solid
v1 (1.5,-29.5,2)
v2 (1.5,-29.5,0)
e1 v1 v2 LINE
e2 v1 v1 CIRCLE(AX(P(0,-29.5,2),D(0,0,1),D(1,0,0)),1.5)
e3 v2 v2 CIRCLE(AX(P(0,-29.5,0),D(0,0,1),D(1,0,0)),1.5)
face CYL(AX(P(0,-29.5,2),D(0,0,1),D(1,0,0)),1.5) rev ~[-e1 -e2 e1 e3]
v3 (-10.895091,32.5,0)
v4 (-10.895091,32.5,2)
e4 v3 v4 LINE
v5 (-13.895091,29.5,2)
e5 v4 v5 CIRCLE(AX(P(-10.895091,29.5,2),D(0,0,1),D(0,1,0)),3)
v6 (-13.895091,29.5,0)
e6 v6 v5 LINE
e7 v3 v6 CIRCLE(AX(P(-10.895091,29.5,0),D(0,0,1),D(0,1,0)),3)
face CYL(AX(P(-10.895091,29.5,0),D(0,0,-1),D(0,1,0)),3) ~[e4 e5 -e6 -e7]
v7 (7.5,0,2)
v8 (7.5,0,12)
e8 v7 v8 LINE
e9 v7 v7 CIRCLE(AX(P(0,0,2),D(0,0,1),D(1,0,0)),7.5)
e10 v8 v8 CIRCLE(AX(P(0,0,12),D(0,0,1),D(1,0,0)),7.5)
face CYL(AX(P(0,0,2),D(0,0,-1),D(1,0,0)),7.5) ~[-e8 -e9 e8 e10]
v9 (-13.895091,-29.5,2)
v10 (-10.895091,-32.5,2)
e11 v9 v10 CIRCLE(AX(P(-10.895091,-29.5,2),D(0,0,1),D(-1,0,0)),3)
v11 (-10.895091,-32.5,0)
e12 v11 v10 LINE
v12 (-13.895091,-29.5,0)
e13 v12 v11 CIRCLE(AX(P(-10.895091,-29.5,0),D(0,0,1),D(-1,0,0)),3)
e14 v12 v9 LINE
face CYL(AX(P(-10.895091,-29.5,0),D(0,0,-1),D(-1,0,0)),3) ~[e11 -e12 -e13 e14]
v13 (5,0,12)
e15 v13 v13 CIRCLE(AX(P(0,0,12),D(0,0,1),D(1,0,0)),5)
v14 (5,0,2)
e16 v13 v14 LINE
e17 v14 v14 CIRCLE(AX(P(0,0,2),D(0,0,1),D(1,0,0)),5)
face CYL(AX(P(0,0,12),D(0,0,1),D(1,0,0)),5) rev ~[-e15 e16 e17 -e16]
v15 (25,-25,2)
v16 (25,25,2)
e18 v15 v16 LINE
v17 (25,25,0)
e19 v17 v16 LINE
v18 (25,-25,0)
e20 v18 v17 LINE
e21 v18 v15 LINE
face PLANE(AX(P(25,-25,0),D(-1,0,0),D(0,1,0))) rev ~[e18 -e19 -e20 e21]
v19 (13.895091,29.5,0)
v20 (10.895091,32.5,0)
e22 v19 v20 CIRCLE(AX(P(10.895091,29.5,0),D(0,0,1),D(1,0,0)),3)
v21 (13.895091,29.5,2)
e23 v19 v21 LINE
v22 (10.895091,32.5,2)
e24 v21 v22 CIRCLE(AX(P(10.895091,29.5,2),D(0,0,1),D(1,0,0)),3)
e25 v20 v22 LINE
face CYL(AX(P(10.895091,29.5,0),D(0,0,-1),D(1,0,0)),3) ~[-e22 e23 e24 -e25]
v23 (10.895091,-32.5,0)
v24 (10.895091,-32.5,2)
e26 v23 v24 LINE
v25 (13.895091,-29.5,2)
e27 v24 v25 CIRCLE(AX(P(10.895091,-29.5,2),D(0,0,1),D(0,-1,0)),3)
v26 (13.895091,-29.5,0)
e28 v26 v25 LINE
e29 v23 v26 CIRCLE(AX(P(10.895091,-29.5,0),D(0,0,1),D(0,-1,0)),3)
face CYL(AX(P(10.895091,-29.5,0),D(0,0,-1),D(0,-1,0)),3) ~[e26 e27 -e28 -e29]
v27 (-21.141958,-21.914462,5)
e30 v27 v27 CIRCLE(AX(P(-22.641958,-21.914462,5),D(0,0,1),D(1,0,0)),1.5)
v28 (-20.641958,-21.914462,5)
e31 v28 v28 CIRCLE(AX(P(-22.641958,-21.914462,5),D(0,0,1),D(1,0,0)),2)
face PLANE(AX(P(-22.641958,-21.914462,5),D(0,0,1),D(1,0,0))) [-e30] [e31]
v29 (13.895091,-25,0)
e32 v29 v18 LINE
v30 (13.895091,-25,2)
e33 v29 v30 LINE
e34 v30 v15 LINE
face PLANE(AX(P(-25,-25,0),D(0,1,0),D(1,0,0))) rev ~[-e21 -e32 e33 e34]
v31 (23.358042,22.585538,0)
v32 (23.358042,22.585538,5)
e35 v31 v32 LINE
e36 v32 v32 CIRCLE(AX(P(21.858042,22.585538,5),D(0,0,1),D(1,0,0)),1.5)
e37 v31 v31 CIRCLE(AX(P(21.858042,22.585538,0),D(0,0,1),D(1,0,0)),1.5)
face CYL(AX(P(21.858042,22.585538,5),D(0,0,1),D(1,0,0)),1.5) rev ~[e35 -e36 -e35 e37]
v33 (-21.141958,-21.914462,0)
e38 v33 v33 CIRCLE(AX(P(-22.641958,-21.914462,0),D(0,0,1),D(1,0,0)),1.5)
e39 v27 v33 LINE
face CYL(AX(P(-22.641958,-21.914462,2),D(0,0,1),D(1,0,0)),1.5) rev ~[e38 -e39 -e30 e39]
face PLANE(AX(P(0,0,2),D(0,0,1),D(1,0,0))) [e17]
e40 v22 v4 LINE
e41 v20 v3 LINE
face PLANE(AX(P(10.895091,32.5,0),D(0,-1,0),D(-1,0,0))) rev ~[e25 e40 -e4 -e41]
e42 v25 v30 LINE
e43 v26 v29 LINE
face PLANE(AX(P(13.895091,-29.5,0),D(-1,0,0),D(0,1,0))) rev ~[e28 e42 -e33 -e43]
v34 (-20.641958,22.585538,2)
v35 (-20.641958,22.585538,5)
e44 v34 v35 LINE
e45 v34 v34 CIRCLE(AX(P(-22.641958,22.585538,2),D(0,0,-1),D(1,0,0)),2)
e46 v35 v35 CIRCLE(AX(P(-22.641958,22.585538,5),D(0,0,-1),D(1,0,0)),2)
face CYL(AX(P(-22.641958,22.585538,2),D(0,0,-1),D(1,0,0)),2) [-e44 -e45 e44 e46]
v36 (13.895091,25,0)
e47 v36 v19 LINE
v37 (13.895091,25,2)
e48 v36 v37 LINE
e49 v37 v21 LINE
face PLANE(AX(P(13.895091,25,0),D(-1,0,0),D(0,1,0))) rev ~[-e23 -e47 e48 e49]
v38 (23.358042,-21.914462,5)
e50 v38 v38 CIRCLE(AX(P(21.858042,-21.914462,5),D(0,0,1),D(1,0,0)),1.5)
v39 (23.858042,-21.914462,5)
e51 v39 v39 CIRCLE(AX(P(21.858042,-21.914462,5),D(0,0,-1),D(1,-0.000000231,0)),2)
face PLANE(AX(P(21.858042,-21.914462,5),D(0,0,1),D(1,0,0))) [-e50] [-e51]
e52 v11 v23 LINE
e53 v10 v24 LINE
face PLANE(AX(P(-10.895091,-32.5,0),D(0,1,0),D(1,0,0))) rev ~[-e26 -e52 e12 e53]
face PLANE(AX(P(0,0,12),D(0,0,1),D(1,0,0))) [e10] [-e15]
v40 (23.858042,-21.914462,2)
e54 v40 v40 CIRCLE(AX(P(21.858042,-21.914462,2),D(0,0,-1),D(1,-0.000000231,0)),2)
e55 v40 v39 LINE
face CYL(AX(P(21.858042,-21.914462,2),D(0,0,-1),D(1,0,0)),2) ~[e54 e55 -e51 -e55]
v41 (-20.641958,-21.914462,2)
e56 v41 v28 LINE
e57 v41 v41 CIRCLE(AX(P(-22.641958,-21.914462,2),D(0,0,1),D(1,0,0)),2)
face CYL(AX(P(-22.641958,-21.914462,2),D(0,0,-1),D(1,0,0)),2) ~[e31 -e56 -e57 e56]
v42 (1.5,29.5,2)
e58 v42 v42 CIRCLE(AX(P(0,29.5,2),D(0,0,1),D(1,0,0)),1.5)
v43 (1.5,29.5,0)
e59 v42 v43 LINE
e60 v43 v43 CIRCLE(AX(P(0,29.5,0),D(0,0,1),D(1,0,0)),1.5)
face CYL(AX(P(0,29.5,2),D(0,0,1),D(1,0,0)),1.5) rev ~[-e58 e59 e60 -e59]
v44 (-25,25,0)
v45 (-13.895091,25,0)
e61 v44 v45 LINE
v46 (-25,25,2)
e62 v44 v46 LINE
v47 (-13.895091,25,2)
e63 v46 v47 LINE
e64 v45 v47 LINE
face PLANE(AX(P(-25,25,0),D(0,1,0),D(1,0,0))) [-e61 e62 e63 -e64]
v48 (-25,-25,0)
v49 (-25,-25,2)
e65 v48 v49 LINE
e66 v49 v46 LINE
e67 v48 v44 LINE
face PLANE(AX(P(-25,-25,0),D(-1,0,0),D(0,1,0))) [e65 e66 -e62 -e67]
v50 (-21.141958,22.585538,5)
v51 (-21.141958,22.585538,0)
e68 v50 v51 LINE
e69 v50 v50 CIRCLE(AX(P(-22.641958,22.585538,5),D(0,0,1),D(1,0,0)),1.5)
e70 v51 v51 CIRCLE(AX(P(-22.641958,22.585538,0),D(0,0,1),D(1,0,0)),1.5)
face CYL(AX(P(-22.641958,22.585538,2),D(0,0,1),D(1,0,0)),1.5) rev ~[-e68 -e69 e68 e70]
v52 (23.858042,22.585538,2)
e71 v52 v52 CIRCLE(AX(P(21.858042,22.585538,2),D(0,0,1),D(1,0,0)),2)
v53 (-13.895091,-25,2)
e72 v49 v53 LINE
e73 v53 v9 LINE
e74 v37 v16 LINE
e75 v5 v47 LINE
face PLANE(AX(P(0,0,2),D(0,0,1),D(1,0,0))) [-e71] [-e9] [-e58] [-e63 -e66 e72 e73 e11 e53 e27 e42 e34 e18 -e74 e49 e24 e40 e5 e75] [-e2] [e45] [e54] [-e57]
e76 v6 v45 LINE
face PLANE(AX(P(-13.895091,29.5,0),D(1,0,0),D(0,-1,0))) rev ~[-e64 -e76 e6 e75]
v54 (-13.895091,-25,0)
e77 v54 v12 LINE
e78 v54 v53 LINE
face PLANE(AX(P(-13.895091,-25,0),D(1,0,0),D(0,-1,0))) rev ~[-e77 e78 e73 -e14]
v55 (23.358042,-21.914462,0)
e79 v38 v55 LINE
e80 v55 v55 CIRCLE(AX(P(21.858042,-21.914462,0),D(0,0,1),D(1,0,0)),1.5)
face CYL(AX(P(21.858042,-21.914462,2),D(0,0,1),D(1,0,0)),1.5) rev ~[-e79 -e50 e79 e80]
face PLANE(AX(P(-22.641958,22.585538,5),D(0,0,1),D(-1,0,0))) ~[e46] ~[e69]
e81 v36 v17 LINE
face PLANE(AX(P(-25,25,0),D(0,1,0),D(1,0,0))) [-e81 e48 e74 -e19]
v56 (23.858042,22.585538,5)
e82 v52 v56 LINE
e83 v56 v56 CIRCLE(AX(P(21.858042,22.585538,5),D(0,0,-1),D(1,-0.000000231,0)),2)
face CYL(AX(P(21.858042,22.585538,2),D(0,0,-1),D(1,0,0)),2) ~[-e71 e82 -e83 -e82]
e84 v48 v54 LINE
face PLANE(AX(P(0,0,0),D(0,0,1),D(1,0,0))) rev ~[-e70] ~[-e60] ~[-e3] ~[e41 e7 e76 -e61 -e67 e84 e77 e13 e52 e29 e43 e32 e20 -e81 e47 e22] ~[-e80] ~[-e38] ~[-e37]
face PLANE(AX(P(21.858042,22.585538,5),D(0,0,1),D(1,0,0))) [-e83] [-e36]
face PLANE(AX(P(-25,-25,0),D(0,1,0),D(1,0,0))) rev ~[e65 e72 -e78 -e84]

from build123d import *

# Parameters (mm, degrees)
F0_W      = 50
F0_H      = 50
F1_DEPTH  = 2
F2_R      = 2
F3_DEPTH  = 3
F4_R      = 1.5
F5_DEPTH  = 3
F7_DEPTH  = 2
F8_R      = 1.5
F9_DEPTH  = 25
F10_R     = 7.5
F11_DEPTH = 10
F12_R     = 5
F13_DEPTH = 10
F14_DEPTH = 7.7


# Not quite as in the source:
# - a pattern or mirror of a feature is missing from the dataset's text; its kind, count and spacing are read off the source's solid
# - a feature names something its author has since deleted; it is built from what else it names


with BuildPart() as f1:
    # F0 (on Top) → F1 (new body)
    with BuildSketch(Plane.XY):
        Rectangle(F0_W, F0_H)
    extrude(amount=F1_DEPTH)

    # F2 (on face) → F3 (join)
    with BuildSketch(Plane.XY.offset(2)):
        with Locations((-22.6419584364, -21.9144617685)):
            Circle(F2_R)
        with Locations((21.8580415636, -21.9144617685)):
            Circle(F2_R)
        with Locations((21.8580415636, 22.5855382315)):
            Circle(F2_R)
    f3 = extrude(amount=F3_DEPTH)

    # F3_copies: F3 across plane
    add(f3.mirror(Plane.ZX.offset(0.335538)))

    # F4 (on face) → F5 (cut)
    with BuildSketch(Plane.XY.offset(5)):
        with Locations((-22.6419584364, 22.5855382315)):
            Circle(F4_R)
        with Locations((21.8580415636, -21.9144617685)):
            Circle(F4_R)
        with Locations((21.8580415636, 22.5855382315)):
            Circle(F4_R)
        with Locations((-22.6419584364, -21.9144617685)):
            Circle(F4_R)
    extrude(amount=-F5_DEPTH, mode=Mode.SUBTRACT)

    # F6 (on Top) → F7 (join)
    with BuildSketch(Plane.XY):
        with BuildLine():
            ThreePointArc((13.8950906601, 29.5), (13.0164110037, 31.6213203436), (10.8950906601, 32.5))
            Line((10.8950906601, 32.5), (-10.8950906601, 32.5))
            ThreePointArc((-10.8950906601, 32.5), (-13.0164110037, 31.6213203436), (-13.8950906601, 29.5))
            Line((-13.8950906601, 29.5), (-13.8950906601, 25))
            Line((-13.8950906601, 25), (13.8950906601, 25))
            Line((13.8950906601, 25), (13.8950906601, 29.5))
        make_face()
        with BuildLine():
            Line((13.8950906601, -25), (-13.8950906601, -25))
            Line((-13.8950906601, -25), (-13.8950906601, -29.5))
            ThreePointArc((-13.8950906601, -29.5), (-13.0164110037, -31.6213203436), (-10.8950906601, -32.5))
            Line((-10.8950906601, -32.5), (10.8950906601, -32.5))
            ThreePointArc((10.8950906601, -32.5), (13.0164110037, -31.6213203436), (13.8950906601, -29.5))
            Line((13.8950906601, -29.5), (13.8950906601, -25))
        make_face()
    extrude(amount=F7_DEPTH)

    # F8 (on face) → F9 (cut)
    with BuildSketch(Plane.XY.offset(2)):
        with Locations((0, 29.5)):
            Circle(F8_R)
        with Locations((0, -29.5)):
            Circle(F8_R)
    extrude(amount=-F9_DEPTH, mode=Mode.SUBTRACT)

    # F10 (on face) → F11 (join)
    with BuildSketch(Plane.XY.offset(2)):
        Circle(F10_R)
    extrude(amount=F11_DEPTH)

    # F12 (on face) → F13 (cut)
    with BuildSketch(Plane.XY.offset(12)):
        Circle(F12_R)
    extrude(amount=-F13_DEPTH, mode=Mode.SUBTRACT)

    # F14 (cut): faces of the model
    f14_faces = [f1.faces().sort_by_distance(p)[0] for p in [
        (-22.6419584364, -21.9144617685, 2),
        (-22.6419584364, 22.5855382315, 2),
        (21.8580415636, 22.5855382315, 2),
        (21.8580415636, -21.9144617685, 2),
    ]]
    extrude(f14_faces, amount=-F14_DEPTH, mode=Mode.SUBTRACT)


solid = f1.part
